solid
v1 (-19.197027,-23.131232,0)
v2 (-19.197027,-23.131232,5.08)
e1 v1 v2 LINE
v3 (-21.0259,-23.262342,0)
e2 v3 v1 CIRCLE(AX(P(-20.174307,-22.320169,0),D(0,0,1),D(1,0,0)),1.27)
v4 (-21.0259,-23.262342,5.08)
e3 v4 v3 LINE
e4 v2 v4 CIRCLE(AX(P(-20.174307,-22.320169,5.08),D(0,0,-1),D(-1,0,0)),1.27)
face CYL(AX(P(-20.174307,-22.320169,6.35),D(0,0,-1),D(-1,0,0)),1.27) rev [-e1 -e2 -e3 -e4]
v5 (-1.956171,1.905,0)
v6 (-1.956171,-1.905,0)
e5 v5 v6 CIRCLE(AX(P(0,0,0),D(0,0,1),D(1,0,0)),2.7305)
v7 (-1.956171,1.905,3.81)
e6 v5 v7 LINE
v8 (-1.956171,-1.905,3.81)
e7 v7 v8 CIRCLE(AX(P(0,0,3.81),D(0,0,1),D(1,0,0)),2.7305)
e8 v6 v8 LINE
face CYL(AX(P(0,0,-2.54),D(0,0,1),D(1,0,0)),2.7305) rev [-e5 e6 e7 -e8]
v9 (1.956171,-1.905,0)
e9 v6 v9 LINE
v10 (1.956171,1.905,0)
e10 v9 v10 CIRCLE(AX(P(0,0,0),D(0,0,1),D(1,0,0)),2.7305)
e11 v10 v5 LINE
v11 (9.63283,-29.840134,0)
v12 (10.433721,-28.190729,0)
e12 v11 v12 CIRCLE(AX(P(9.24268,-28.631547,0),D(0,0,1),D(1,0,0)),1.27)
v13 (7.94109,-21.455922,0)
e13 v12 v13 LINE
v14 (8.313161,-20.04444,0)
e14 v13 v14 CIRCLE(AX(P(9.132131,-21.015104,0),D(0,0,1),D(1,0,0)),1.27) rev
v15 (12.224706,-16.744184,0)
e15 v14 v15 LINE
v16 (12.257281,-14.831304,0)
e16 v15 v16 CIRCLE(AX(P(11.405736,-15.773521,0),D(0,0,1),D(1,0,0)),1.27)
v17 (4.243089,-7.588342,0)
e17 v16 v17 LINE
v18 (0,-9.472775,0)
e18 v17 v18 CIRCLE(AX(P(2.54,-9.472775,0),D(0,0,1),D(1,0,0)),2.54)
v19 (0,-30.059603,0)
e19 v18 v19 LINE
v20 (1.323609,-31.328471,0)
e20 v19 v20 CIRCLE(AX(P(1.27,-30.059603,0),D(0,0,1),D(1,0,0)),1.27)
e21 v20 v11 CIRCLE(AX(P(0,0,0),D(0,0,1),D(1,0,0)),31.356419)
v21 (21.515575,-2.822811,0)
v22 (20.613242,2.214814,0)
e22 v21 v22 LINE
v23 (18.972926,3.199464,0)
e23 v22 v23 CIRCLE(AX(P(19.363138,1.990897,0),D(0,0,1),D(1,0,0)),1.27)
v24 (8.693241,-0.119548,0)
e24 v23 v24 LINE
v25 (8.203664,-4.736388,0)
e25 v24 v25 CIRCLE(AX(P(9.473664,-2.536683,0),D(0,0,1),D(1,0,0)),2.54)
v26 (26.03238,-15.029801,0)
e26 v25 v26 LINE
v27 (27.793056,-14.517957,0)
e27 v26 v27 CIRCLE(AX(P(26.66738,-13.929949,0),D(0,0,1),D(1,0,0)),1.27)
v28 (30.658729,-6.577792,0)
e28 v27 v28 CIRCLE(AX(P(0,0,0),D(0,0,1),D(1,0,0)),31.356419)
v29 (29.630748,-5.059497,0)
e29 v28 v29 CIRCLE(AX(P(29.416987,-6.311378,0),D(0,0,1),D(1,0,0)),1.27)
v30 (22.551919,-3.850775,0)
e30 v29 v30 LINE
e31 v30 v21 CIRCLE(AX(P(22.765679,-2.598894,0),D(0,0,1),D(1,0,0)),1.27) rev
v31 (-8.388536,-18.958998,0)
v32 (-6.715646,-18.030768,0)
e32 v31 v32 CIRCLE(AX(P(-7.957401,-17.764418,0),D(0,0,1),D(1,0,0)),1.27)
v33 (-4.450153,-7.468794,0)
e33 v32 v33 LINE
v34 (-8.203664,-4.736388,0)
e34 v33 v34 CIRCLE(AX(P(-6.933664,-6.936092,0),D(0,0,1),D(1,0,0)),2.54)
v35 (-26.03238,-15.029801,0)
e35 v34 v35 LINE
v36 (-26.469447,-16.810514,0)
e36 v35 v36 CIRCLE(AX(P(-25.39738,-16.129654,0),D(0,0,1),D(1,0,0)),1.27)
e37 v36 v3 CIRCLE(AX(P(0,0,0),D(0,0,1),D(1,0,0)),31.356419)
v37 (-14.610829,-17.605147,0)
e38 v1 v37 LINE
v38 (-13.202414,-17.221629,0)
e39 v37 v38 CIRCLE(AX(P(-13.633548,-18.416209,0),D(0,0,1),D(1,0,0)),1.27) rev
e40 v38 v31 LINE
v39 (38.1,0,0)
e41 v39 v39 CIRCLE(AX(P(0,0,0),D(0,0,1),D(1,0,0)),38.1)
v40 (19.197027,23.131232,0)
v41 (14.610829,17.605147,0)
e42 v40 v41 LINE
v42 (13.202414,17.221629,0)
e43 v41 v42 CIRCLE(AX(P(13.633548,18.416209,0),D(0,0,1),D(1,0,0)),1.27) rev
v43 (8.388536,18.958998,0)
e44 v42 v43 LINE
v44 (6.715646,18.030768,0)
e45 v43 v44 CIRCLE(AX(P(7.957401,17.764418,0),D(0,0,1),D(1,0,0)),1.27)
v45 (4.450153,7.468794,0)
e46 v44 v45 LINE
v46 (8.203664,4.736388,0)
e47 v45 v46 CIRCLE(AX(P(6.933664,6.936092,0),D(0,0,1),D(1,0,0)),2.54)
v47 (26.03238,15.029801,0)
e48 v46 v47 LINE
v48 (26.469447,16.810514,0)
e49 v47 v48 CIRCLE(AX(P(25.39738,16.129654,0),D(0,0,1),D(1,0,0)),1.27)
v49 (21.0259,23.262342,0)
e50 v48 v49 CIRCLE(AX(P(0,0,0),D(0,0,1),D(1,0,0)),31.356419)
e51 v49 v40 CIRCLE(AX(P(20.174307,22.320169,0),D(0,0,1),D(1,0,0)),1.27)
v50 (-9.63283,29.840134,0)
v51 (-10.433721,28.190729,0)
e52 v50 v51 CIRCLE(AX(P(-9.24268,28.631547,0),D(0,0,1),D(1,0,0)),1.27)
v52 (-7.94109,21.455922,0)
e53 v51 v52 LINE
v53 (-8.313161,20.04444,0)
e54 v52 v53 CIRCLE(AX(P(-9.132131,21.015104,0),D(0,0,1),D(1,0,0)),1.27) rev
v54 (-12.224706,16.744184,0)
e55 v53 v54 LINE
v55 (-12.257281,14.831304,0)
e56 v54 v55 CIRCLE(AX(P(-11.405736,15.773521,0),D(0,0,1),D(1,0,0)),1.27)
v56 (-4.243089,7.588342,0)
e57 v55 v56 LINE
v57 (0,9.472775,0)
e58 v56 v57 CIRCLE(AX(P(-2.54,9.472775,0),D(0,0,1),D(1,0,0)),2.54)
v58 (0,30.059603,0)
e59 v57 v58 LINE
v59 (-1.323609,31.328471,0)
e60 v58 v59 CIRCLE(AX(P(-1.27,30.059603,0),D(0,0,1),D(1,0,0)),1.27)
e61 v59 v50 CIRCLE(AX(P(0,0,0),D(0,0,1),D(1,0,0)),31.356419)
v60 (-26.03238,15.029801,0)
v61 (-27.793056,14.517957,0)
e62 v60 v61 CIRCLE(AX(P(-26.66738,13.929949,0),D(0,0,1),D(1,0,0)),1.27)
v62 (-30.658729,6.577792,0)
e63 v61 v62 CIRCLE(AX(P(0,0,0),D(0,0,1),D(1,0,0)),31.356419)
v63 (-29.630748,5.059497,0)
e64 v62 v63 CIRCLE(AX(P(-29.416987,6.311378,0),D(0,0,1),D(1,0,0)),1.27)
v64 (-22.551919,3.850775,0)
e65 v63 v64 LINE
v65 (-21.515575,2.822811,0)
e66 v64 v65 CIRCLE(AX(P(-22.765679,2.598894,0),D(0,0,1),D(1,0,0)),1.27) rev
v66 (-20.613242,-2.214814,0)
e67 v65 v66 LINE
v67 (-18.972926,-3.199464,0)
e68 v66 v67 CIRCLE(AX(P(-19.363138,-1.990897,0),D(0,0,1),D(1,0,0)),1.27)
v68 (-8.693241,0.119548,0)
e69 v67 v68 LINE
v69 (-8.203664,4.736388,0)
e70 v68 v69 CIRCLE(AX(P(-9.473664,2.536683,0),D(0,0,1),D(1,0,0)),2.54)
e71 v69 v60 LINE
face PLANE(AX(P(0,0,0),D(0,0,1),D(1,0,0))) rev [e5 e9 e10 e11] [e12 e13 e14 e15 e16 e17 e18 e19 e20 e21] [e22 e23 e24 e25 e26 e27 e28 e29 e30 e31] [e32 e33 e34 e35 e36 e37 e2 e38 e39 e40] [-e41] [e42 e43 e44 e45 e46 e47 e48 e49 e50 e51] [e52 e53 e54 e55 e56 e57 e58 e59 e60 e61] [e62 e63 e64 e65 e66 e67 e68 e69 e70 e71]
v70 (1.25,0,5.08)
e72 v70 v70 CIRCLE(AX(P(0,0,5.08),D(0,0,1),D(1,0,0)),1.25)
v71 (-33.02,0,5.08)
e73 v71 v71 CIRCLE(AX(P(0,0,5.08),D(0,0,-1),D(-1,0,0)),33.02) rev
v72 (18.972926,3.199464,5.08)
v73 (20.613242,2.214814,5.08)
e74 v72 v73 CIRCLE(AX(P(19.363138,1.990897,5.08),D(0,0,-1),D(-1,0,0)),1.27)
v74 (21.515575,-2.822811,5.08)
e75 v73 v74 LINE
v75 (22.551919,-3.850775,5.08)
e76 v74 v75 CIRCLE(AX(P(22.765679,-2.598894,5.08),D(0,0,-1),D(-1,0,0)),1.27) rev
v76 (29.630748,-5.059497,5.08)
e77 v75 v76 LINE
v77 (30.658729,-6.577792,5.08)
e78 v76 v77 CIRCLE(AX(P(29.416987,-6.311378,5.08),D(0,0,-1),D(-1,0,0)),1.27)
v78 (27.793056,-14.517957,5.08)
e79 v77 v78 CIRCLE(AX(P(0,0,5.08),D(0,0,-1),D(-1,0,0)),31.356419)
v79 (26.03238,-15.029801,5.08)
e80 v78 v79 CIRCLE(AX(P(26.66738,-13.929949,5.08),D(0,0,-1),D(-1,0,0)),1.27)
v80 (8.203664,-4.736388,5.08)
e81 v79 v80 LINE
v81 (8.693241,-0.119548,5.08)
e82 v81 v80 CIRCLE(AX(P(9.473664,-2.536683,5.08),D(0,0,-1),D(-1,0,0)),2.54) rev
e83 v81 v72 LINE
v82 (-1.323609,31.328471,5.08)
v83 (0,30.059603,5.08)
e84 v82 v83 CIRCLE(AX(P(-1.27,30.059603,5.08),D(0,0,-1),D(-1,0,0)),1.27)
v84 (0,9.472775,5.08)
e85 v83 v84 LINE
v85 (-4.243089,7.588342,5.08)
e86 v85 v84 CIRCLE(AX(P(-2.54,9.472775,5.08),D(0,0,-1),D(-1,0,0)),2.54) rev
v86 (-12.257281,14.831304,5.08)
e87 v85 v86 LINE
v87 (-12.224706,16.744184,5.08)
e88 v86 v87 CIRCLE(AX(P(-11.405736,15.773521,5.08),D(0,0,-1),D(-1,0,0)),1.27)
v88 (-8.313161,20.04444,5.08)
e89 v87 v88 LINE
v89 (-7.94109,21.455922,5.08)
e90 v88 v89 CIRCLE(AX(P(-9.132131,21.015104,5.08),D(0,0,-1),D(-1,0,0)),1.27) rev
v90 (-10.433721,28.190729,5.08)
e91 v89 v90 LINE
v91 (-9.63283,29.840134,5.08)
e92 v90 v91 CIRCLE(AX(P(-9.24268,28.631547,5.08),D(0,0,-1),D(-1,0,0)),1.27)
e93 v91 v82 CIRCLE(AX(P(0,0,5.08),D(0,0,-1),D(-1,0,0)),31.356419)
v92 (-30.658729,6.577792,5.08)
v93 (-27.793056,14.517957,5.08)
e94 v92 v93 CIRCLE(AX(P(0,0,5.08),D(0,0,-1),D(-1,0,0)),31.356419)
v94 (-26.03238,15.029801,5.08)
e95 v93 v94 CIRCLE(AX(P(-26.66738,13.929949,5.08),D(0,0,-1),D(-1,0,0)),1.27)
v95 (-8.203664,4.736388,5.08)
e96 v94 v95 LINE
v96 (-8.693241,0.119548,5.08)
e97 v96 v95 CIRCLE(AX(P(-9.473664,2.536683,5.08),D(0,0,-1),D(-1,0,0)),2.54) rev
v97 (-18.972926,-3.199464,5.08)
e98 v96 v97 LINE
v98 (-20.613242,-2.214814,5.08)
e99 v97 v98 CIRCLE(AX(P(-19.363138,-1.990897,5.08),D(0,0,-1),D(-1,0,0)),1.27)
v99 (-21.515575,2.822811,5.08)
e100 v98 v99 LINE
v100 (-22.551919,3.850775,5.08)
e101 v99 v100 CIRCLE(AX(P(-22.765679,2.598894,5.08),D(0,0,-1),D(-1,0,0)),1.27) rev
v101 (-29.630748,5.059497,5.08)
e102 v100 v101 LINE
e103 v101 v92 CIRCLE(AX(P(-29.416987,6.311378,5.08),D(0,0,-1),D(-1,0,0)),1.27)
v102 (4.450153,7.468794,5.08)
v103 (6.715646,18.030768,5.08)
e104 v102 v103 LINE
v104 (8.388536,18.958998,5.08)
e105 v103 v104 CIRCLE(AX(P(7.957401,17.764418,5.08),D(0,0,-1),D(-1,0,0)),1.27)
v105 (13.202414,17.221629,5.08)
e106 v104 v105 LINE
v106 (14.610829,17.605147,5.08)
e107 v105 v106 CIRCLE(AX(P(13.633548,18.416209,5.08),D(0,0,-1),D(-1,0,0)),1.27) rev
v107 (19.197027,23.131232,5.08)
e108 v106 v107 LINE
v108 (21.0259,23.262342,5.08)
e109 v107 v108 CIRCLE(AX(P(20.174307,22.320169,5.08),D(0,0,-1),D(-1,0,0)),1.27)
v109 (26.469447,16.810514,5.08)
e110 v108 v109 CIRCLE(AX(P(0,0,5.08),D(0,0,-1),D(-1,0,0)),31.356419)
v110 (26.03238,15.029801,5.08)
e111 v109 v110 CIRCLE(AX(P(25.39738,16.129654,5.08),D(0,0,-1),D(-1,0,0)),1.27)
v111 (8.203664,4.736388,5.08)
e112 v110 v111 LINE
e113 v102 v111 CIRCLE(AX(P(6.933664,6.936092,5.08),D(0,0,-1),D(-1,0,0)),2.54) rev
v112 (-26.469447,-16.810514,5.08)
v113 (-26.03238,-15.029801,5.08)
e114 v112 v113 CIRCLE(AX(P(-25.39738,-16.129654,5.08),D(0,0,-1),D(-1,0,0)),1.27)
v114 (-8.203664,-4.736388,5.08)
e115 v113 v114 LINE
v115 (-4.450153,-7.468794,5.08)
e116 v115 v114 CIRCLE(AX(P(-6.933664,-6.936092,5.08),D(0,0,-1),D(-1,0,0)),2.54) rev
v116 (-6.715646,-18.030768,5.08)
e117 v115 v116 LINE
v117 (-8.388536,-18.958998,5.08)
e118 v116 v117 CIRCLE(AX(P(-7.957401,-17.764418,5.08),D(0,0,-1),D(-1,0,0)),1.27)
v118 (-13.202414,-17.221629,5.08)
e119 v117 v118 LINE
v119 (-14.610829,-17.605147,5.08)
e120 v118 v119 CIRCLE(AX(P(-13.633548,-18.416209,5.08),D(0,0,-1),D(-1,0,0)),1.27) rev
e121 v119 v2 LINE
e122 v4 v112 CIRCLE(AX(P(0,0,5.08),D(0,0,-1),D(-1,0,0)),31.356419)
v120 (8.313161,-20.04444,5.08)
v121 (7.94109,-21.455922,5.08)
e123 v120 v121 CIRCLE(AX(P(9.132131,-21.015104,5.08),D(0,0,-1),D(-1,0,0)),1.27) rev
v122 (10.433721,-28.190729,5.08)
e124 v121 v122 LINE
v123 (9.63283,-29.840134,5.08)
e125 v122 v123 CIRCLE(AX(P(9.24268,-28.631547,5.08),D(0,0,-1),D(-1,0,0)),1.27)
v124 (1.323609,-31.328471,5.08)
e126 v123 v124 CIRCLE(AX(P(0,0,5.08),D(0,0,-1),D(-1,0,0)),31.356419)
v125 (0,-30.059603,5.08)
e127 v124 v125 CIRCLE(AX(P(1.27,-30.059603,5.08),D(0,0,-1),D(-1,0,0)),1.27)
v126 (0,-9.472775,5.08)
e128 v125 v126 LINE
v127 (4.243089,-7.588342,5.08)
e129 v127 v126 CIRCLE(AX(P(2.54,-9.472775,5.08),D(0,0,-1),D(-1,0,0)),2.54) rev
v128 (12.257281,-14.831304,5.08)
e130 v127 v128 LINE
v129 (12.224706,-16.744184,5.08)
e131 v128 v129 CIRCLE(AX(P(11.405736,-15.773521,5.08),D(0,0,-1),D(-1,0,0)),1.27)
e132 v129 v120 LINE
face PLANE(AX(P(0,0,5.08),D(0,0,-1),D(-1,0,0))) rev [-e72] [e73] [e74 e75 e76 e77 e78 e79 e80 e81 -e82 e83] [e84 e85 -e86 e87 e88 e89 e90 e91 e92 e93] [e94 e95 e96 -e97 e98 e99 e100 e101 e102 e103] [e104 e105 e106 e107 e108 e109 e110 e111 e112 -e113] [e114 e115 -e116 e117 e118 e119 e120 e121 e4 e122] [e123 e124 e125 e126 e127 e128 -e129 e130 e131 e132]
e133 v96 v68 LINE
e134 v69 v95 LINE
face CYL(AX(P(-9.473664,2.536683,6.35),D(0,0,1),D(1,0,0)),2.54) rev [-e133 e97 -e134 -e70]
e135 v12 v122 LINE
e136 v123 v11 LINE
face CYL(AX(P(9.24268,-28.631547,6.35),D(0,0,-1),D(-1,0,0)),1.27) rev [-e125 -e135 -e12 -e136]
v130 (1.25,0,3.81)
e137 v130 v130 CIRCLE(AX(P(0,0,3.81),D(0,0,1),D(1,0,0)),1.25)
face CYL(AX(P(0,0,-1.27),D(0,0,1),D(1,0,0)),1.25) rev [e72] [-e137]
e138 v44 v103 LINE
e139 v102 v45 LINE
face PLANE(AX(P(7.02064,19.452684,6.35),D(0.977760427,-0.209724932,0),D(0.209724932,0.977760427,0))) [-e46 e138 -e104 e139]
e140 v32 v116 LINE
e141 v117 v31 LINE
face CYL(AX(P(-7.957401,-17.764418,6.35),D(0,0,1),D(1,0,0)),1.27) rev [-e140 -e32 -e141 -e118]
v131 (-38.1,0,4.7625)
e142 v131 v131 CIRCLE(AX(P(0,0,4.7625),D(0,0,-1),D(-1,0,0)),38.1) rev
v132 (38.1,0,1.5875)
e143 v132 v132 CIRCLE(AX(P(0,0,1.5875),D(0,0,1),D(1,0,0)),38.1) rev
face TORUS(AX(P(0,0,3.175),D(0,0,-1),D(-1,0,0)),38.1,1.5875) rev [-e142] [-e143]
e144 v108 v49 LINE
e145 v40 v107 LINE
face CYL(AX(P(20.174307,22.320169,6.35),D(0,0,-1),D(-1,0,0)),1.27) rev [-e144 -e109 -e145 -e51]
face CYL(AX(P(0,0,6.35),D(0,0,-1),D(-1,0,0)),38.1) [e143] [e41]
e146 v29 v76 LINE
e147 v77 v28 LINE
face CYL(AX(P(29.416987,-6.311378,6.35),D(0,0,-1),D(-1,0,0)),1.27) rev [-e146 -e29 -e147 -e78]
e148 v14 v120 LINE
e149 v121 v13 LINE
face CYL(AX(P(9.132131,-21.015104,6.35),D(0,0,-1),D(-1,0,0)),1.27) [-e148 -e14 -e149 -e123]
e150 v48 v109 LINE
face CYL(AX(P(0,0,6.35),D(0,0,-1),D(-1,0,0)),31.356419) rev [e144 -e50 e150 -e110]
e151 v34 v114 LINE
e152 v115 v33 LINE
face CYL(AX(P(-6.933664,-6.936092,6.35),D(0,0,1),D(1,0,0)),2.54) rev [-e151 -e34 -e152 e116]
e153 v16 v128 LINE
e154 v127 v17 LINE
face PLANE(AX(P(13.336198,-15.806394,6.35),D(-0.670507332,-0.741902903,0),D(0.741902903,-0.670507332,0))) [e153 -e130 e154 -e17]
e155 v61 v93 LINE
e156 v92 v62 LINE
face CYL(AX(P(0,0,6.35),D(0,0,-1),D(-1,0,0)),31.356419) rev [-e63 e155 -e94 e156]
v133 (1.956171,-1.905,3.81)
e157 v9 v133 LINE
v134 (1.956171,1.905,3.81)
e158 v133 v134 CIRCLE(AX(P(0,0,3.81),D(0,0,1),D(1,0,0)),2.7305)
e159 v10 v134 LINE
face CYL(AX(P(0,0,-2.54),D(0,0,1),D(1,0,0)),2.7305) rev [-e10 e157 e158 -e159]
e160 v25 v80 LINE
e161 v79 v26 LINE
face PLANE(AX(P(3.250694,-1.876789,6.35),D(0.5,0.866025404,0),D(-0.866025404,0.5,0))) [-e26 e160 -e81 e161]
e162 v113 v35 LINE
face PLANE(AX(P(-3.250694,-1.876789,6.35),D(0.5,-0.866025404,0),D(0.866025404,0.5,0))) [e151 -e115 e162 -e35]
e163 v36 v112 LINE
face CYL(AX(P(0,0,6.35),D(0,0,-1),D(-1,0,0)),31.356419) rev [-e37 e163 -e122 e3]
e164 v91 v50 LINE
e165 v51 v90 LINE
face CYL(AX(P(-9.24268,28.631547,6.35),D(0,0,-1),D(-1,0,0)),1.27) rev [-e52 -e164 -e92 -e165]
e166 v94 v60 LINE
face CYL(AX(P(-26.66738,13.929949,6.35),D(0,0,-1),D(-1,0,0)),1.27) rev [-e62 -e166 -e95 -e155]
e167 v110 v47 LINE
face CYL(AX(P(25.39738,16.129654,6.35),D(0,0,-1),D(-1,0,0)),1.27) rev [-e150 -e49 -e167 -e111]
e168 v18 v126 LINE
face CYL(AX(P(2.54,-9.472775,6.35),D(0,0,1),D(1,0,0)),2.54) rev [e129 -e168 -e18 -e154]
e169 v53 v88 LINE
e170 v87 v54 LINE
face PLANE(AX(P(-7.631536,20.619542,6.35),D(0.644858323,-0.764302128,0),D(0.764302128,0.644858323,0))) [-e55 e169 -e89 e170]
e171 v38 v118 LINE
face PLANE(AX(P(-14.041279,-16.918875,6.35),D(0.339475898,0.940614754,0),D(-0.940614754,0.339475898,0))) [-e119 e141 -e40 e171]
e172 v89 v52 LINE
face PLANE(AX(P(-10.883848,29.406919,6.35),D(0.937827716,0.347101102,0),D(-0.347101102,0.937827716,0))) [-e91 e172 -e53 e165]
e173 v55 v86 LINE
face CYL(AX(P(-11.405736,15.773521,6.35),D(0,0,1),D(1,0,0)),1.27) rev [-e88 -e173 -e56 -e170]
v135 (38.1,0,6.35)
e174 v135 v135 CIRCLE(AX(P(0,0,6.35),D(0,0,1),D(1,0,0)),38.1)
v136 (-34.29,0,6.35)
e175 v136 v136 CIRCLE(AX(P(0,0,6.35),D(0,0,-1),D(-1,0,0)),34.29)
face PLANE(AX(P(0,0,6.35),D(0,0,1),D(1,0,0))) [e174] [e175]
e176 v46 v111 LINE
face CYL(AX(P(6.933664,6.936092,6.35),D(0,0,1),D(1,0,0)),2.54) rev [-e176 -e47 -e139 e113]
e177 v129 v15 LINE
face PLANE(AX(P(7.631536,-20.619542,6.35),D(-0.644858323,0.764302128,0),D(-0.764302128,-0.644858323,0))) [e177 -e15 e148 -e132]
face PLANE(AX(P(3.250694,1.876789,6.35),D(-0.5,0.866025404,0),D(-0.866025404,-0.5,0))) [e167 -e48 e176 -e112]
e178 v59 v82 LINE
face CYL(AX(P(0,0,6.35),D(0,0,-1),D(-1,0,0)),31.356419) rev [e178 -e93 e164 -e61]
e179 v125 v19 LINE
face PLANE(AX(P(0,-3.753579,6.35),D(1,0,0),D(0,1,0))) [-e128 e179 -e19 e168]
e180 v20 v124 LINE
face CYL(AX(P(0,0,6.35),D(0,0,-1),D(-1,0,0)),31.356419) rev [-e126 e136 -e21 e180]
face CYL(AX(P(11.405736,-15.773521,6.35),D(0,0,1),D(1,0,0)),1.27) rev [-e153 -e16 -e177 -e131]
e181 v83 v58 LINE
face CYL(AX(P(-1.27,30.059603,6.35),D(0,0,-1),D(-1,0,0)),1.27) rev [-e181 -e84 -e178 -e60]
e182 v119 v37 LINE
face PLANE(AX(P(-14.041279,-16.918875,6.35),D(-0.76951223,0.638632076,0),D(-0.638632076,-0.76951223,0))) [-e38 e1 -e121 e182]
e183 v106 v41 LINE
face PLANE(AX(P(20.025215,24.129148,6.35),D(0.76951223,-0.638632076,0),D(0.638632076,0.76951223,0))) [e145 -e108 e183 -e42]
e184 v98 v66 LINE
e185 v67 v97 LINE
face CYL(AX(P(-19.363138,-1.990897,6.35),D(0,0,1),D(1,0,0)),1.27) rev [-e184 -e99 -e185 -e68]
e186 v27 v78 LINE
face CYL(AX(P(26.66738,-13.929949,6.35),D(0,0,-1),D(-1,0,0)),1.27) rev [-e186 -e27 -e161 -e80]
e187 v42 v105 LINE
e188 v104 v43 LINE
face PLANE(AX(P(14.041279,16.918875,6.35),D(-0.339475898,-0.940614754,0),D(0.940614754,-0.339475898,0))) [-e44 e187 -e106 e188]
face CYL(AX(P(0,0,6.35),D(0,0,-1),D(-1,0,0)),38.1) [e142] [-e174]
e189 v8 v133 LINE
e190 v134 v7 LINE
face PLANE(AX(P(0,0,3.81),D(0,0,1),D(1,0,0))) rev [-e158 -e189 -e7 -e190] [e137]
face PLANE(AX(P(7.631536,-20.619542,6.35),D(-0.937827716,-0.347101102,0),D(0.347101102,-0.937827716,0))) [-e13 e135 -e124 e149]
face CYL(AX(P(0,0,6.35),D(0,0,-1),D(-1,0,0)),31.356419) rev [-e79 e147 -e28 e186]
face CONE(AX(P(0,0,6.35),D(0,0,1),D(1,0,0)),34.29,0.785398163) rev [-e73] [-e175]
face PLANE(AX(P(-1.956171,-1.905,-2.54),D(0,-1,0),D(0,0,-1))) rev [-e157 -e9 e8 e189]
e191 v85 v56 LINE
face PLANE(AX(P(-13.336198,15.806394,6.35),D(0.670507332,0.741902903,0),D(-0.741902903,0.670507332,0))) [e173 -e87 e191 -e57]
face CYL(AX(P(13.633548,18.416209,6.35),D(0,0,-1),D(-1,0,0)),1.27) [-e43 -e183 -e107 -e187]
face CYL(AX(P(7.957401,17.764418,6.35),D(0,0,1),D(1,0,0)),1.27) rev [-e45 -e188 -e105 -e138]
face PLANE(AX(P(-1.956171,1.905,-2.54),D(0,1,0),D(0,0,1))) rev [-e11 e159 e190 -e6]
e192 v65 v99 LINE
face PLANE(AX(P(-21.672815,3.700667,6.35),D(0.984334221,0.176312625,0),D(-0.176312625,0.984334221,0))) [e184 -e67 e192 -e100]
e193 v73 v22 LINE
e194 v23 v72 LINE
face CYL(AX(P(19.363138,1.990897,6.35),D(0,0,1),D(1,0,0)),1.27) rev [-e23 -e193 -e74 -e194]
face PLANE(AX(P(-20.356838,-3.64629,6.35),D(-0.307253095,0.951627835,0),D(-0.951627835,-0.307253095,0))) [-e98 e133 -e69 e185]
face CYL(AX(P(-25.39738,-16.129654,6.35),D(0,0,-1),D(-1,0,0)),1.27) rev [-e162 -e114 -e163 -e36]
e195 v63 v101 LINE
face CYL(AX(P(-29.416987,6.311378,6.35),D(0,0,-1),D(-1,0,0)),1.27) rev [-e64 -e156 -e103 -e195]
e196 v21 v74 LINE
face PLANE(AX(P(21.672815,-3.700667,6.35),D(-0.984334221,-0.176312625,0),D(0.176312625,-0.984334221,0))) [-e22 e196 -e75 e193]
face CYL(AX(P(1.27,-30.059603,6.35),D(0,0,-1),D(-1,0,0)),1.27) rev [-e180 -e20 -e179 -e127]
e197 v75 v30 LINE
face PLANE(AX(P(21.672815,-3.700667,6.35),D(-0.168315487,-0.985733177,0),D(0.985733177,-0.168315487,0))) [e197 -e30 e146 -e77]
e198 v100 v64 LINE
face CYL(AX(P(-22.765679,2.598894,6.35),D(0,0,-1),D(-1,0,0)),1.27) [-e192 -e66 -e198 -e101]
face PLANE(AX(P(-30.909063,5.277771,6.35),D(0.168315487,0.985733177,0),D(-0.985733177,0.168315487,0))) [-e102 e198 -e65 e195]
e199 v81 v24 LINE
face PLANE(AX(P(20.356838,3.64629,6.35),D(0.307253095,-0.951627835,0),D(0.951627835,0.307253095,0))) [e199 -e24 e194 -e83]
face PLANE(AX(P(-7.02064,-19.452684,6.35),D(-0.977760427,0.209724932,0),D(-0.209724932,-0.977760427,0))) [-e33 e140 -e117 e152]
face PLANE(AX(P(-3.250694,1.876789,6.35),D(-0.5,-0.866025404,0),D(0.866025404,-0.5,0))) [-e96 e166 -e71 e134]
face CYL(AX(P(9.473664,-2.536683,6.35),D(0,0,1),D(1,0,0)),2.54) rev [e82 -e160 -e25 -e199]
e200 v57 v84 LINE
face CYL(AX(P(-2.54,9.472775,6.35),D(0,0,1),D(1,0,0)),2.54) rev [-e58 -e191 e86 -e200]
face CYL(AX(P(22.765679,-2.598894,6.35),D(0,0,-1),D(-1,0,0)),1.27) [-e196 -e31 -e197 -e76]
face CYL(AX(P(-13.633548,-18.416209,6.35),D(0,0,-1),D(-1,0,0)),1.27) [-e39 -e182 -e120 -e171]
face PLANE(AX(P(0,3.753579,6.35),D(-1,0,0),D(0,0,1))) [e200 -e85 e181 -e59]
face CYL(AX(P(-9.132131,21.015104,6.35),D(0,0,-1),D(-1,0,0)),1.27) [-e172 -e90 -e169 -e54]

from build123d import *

# Parameters (mm, degrees)
SKETCH1_R           = 38.1
BOSS_EXTRUDE1_DEPTH = 6.35
FILLET1_R           = 2.54
CUT_EXTRUDE1_START  = -2.54
CUT_EXTRUDE1_DEPTH  = 6.35
SKETCH3_W           = 34.29
SKETCH3_H           = 1.27
SKETCH3_R           = 1.5875
FILLET2_R           = 1.27
SKETCH4_R           = 1.25
CUT_EXTRUDE2_DEPTH  = 6.35
CHAMFER1_SIZE       = 1.27


with BuildPart() as part:
    # Sketch1 → Boss-Extrude1 (new body)
    with BuildSketch(Plane.XY):
        Circle(SKETCH1_R)
        with BuildLine():
            Line((0, 3.753578648), (0, 31.356419273))
            ThreePointArc((0, 31.356419273), (-5.528532606, 30.86519653), (-10.883847669, 29.406919076))
            Line((-10.883847669, 29.406919076), (-7.631535777, 20.619542081))
            Line((-7.631535777, 20.619542081), (-13.336198426, 15.806394174))
            Line((-13.336198426, 15.806394174), (0, 3.753578648))
        make_face(mode=Mode.SUBTRACT)
        with BuildLine():
            Line((20.025215132, 24.12914811), (14.041279368, 16.918874893))
            Line((14.041279368, 16.918874893), (7.020639684, 19.452683713))
            Line((7.020639684, 19.452683713), (3.250694465, 1.876789324))
            Line((3.250694465, 1.876789324), (27.155455662, 15.678209636))
            ThreePointArc((27.155455662, 15.678209636), (23.965777985, 20.220447947), (20.025215132, 24.12914811))
        make_face(mode=Mode.SUBTRACT)
        with BuildLine():
            Line((20.35683811, 3.646289539), (3.250694465, -1.876789324))
            Line((3.250694465, -1.876789324), (27.155455662, -15.678209636))
            ThreePointArc((27.155455662, -15.678209636), (29.494310591, -10.644748583), (30.909062801, -5.277770966))
            Line((30.909062801, -5.277770966), (21.672815145, -3.700667188))
            Line((21.672815145, -3.700667188), (20.35683811, 3.646289539))
        make_face(mode=Mode.SUBTRACT)
        with BuildLine():
            Line((13.336198426, -15.806394174), (0, -3.753578648))
            Line((0, -3.753578648), (0, -31.356419273))
            ThreePointArc((0, -31.356419273), (5.528532606, -30.86519653), (10.883847669, -29.406919076))
            Line((10.883847669, -29.406919076), (7.631535777, -20.619542081))
            Line((7.631535777, -20.619542081), (13.336198426, -15.806394174))
        make_face(mode=Mode.SUBTRACT)
        with BuildLine():
            Line((-7.020639684, -19.452683713), (-3.250694465, -1.876789324))
            Line((-3.250694465, -1.876789324), (-27.155455662, -15.678209636))
            ThreePointArc((-27.155455662, -15.678209636), (-23.965777985, -20.220447947), (-20.025215132, -24.12914811))
            Line((-20.025215132, -24.12914811), (-14.041279368, -16.918874893))
            Line((-14.041279368, -16.918874893), (-7.020639684, -19.452683713))
        make_face(mode=Mode.SUBTRACT)
        with BuildLine():
            Line((-20.35683811, -3.646289539), (-3.250694465, 1.876789324))
            Line((-3.250694465, 1.876789324), (-27.155455662, 15.678209636))
            ThreePointArc((-27.155455662, 15.678209636), (-29.494310591, 10.644748583), (-30.909062801, 5.277770966))
            Line((-30.909062801, 5.277770966), (-21.672815145, 3.700667188))
            Line((-21.672815145, 3.700667188), (-20.35683811, -3.646289539))
        make_face(mode=Mode.SUBTRACT)
    extrude(amount=BOSS_EXTRUDE1_DEPTH)

    # Fillet1
    fillet1_edges = [part.edges().sort_by_distance(p)[0] for p in [
        (0, 3.753578648, 3.175),
        (3.250694465, 1.876789324, 3.175),
        (3.250694465, -1.876789324, 3.175),
        (0, -3.753578648, 3.175),
        (-3.250694465, -1.876789324, 3.175),
        (-3.250694465, 1.876789324, 3.175),
    ]]
    fillet(fillet1_edges, radius=FILLET1_R)

    # Sketch2 → Cut-Extrude1 (cut)
    with BuildSketch(Plane.XY.offset(6.35).offset(CUT_EXTRUDE1_START)):
        with BuildLine():
            Line((-1.956171069, 1.905), (1.956171069, 1.905))
            ThreePointArc((1.956171069, 1.905), (2.7305, 0), (1.956171069, -1.905))
            Line((1.956171069, -1.905), (-1.956171069, -1.905))
            ThreePointArc((-1.956171069, -1.905), (-2.7305, 0), (-1.956171069, 1.905))
        make_face()
    extrude(amount=-CUT_EXTRUDE1_DEPTH, mode=Mode.SUBTRACT)

    # Sketch3 → Cut-Revolve1 (revolve, cut)
    with BuildSketch(Plane(origin=(0, 0, 0), x_dir=(1, 0, 0), z_dir=(0, 1, 0))):
        with Locations((-17.145, -5.715)):
            Rectangle(SKETCH3_W, SKETCH3_H)
        with Locations((-38.1, -3.175)):
            Circle(SKETCH3_R)
    revolve(axis=Axis((0, 0, 1.27), (0, 0, 1)), mode=Mode.SUBTRACT)

    # Fillet2
    fillet2_edges = [part.edges().sort_by_distance(p)[0] for p in [
        (-27.155455662, -15.678209636, 2.54),
        (-7.020639684, -19.452683713, 2.54),
        (-14.041279368, -16.918874893, 2.54),
        (-20.025215132, -24.12914811, 2.54),
        (13.336198426, -15.806394174, 2.54),
        (7.631535777, -20.619542081, 2.54),
        (10.883847669, -29.406919076, 2.54),
        (0, -31.356419273, 2.54),
        (20.35683811, 3.646289539, 2.54),
        (21.672815145, -3.700667188, 2.54),
        (30.909062801, -5.277770966, 2.54),
        (27.155455662, -15.678209636, 2.54),
        (27.155455662, 15.678209636, 2.54),
        (7.020639684, 19.452683713, 2.54),
        (14.041279368, 16.918874893, 2.54),
        (20.025215132, 24.12914811, 2.54),
        (0, 31.356419273, 2.54),
        (-13.336198426, 15.806394174, 2.54),
        (-7.631535777, 20.619542081, 2.54),
        (-10.883847669, 29.406919076, 2.54),
        (-20.35683811, -3.646289539, 2.54),
        (-21.672815145, 3.700667188, 2.54),
        (-30.909062801, 5.277770966, 2.54),
        (-27.155455662, 15.678209636, 2.54),
    ]]
    fillet(fillet2_edges, radius=FILLET2_R)

    # Sketch4 → Cut-Extrude2 (cut)
    with BuildSketch(Plane.XY.offset(5.08)):
        Circle(SKETCH4_R)
    extrude(amount=-CUT_EXTRUDE2_DEPTH, mode=Mode.SUBTRACT)

    # Chamfer1
    chamfer1_edges = [part.edges().sort_by_distance(p)[0] for p in [
        (34.29, 0, 5.08),
    ]]
    chamfer(chamfer1_edges, length=CHAMFER1_SIZE - 0.0001)  # a hair under: the kernel refuses the full size


solid = part.part
